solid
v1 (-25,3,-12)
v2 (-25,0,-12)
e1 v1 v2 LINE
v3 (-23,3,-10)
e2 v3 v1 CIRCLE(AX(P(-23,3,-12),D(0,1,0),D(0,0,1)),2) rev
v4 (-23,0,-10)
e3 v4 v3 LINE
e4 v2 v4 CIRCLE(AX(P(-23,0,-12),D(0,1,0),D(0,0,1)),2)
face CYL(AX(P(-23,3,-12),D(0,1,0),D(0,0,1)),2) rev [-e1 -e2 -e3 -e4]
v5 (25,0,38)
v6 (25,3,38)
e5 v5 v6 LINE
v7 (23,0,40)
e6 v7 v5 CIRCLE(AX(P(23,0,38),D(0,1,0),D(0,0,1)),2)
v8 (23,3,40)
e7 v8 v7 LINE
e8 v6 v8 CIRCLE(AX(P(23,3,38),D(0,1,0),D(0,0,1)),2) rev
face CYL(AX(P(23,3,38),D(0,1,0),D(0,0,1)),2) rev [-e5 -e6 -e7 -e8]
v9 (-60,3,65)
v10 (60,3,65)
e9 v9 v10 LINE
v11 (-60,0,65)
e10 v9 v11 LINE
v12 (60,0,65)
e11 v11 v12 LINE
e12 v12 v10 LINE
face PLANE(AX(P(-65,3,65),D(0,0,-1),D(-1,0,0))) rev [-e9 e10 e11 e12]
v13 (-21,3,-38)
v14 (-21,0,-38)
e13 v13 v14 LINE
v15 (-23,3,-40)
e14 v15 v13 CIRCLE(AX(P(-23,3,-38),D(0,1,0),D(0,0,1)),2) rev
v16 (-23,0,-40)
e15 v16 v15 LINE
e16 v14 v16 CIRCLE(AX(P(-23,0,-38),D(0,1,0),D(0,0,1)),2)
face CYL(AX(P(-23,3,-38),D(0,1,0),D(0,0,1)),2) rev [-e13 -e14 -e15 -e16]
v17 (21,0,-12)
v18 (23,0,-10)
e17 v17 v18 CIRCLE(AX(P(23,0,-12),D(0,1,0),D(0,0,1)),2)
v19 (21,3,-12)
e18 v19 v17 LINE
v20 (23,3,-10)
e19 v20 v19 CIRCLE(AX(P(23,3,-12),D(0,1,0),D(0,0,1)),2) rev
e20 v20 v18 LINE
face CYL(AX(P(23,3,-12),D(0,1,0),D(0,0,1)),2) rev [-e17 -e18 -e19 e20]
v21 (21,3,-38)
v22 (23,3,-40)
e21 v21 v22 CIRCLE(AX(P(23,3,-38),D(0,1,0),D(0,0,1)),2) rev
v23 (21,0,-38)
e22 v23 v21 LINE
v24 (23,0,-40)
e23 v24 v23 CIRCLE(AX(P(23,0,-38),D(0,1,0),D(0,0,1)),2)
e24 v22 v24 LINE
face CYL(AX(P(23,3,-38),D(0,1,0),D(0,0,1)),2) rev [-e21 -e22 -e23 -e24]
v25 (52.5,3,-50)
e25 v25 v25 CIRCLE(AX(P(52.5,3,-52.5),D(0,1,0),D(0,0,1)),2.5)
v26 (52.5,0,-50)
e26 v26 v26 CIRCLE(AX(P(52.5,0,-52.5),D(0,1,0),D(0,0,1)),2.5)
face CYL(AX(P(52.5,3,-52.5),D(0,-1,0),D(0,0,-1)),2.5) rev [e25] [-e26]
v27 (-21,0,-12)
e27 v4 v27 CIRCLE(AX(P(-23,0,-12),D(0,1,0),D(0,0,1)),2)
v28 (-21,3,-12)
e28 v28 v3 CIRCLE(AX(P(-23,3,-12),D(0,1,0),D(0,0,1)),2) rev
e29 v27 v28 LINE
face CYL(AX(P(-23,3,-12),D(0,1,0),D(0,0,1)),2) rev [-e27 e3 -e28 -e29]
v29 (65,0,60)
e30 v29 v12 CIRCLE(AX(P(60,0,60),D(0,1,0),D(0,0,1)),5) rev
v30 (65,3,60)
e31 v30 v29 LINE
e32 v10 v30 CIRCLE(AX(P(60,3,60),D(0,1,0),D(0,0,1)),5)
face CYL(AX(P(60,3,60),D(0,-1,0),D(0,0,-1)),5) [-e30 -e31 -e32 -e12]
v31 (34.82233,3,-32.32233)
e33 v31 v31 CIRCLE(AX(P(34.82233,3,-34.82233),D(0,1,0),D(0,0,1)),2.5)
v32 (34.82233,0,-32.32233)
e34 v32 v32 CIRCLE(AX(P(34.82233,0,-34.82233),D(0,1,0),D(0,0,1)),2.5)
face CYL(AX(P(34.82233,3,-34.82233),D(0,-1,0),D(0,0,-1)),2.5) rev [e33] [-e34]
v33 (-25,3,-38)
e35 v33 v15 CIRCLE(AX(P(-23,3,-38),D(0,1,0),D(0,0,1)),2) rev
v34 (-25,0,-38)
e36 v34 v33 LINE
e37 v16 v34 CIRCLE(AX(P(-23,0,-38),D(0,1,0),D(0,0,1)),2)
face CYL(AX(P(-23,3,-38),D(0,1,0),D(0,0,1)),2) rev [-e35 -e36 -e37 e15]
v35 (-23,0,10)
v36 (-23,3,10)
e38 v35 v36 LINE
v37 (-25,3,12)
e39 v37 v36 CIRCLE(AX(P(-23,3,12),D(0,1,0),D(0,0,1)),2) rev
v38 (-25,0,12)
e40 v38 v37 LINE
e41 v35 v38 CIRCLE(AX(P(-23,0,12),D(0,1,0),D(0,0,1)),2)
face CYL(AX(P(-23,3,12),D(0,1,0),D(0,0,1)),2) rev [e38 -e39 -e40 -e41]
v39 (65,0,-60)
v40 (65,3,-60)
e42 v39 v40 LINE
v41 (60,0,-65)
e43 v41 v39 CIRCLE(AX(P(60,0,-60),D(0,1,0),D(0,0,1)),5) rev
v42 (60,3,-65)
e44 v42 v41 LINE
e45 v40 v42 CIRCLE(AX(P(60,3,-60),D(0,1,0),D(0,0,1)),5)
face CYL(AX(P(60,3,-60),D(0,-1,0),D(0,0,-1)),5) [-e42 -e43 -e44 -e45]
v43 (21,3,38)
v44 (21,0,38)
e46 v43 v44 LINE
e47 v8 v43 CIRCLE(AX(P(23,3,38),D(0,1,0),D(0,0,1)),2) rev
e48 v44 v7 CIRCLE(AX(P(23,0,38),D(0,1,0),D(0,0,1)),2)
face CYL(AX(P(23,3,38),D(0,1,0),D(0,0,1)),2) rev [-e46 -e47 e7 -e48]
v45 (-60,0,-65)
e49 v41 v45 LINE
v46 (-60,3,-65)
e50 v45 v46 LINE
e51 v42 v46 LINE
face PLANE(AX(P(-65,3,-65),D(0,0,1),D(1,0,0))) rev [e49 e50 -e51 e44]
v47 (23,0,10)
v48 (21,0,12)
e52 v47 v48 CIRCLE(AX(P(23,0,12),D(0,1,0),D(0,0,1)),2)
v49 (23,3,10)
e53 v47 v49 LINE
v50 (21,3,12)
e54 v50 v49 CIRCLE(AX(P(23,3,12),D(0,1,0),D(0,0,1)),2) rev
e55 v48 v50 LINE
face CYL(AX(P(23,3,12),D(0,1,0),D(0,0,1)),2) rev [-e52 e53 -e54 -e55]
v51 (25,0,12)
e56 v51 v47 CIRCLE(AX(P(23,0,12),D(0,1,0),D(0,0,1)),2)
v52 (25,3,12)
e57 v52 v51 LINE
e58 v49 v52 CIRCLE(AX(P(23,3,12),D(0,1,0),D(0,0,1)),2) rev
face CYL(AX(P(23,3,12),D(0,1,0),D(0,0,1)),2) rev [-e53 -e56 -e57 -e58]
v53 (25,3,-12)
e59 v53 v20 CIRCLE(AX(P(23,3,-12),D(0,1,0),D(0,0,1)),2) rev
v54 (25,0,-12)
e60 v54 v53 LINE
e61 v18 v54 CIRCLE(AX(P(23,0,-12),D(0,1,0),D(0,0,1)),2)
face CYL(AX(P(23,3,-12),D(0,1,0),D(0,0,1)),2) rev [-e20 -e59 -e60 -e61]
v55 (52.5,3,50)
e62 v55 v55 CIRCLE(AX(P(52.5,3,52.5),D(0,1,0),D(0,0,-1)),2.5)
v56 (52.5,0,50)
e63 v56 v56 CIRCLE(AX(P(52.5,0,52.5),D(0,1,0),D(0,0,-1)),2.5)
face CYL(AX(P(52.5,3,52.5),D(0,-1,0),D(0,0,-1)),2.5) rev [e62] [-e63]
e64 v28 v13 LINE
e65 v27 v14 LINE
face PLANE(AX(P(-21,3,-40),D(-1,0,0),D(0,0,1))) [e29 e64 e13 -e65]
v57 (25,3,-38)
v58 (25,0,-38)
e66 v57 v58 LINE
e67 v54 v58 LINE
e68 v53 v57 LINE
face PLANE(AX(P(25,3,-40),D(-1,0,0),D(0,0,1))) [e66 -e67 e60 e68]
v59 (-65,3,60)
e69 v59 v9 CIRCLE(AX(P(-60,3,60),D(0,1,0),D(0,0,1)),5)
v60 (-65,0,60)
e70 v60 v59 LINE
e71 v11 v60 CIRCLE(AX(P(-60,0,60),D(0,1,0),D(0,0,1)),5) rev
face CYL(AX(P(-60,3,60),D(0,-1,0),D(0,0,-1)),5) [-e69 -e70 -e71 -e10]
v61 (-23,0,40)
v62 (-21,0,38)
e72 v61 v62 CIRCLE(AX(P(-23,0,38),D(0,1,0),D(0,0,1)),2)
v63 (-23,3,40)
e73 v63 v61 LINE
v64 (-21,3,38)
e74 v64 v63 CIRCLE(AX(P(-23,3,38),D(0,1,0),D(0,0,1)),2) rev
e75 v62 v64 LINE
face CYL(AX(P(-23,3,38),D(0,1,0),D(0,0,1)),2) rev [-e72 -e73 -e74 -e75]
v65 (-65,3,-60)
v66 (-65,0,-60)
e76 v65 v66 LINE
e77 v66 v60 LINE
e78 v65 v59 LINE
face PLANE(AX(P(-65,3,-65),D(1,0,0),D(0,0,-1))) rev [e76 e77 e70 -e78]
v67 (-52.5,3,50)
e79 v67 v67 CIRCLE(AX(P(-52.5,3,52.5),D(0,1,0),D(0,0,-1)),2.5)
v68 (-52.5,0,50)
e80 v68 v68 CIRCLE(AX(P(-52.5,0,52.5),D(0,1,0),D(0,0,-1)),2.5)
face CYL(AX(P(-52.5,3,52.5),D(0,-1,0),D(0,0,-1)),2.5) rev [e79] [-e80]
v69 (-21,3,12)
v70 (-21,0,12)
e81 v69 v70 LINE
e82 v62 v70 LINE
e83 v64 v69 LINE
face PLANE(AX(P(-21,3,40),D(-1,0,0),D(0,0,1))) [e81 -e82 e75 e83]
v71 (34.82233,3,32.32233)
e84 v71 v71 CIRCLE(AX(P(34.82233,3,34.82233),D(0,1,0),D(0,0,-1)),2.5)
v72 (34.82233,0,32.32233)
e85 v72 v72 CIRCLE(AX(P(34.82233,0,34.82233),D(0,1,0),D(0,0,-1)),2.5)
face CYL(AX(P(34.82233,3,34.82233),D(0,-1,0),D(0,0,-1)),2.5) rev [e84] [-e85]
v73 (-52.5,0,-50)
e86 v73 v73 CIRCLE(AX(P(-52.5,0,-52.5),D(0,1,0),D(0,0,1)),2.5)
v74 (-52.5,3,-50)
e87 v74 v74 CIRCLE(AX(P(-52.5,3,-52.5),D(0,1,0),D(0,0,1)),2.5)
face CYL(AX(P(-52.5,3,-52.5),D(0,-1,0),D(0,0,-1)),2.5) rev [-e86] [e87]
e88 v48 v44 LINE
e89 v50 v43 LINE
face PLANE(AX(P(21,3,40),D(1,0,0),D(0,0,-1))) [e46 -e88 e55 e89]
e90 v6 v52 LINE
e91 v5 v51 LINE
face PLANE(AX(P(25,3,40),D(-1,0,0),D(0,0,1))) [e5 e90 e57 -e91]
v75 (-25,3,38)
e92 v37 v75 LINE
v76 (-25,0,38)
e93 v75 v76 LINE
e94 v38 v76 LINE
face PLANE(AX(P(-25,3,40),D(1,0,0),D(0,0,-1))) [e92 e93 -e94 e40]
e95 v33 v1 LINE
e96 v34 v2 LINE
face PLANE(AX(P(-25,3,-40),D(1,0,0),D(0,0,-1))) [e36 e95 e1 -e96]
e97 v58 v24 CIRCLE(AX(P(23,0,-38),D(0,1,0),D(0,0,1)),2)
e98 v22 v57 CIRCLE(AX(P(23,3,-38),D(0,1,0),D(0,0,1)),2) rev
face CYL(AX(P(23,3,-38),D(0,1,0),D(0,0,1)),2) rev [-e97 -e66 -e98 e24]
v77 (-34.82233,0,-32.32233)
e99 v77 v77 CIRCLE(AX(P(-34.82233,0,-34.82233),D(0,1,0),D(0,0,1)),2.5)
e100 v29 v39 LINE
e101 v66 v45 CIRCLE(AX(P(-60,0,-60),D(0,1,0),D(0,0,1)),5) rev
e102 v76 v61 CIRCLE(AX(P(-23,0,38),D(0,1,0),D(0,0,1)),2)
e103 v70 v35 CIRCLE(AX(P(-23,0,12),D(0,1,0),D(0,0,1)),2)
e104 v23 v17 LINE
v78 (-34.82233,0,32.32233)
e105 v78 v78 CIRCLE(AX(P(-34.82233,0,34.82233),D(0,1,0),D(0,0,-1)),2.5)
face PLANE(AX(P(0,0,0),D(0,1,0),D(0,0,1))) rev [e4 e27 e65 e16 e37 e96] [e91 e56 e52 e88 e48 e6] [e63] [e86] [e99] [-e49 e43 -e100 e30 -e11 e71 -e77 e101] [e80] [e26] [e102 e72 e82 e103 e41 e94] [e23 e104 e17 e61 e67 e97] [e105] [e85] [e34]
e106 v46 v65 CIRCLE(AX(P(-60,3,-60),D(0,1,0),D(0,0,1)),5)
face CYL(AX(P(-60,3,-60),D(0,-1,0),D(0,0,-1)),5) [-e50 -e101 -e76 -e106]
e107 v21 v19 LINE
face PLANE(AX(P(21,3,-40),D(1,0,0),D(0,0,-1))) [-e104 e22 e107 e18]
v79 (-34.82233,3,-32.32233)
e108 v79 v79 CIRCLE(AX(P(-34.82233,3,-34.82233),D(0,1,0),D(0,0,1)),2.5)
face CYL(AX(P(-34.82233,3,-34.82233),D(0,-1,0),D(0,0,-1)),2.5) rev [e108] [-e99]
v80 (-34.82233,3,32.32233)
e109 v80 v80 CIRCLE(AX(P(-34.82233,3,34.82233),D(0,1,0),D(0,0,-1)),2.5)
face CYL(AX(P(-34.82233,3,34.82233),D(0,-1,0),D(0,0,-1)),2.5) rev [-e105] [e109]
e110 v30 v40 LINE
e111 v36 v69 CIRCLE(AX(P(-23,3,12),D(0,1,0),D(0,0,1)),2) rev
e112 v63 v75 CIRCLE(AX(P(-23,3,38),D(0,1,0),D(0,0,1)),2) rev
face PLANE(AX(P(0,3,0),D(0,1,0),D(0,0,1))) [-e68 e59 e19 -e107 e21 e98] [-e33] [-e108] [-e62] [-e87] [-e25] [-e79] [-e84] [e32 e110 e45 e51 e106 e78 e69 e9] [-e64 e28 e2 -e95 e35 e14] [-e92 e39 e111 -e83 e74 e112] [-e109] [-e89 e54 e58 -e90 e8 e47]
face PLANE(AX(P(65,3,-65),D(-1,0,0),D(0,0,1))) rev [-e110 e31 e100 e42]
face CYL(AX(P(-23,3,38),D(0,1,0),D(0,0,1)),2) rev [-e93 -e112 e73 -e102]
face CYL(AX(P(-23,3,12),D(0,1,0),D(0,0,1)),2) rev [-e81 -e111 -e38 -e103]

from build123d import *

# Parameters (mm, degrees)
SKETCH1_W           = 130
SKETCH1_H           = 130
SKETCH1_R           = 2.5
SKETCH1_W_2         = 4
SKETCH1_H_2         = 30
BOSS_EXTRUDE1_DEPTH = 3
FILLET1_R           = 5
FILLET2_R           = 2


with BuildPart() as part:
    # Sketch1 → Boss-Extrude1 (new body)
    with BuildSketch(Plane(origin=(0, 0, 0), x_dir=(1, 0, 0), z_dir=(0, 1, 0))):
        Rectangle(SKETCH1_W, SKETCH1_H)
        with Locations(Location((-52.5, 52.5, 0), (0, 0, 270))):
            Circle(SKETCH1_R, mode=Mode.SUBTRACT)
        with Locations(Location((-34.82233047, 34.82233047, 0), (0, 0, 270))):
            Circle(SKETCH1_R, mode=Mode.SUBTRACT)
        with Locations(Location((52.5, 52.5, 0), (0, 0, 270))):
            Circle(SKETCH1_R, mode=Mode.SUBTRACT)
        with Locations(Location((34.82233047, 34.82233047, 0), (0, 0, 270))):
            Circle(SKETCH1_R, mode=Mode.SUBTRACT)
        with Locations(Location((52.5, -52.5, 0), (0, 0, 90))):
            Circle(SKETCH1_R, mode=Mode.SUBTRACT)
        with Locations(Location((34.82233047, -34.82233047, 0), (0, 0, 90))):
            Circle(SKETCH1_R, mode=Mode.SUBTRACT)
        with Locations(Location((-34.82233047, -34.82233047, 0), (0, 0, 90))):
            Circle(SKETCH1_R, mode=Mode.SUBTRACT)
        with Locations(Location((-52.5, -52.5, 0), (0, 0, 90))):
            Circle(SKETCH1_R, mode=Mode.SUBTRACT)
        with Locations((-23, 25)):
            Rectangle(SKETCH1_W_2, SKETCH1_H_2, mode=Mode.SUBTRACT)
        with Locations((23, 25)):
            Rectangle(SKETCH1_W_2, SKETCH1_H_2, mode=Mode.SUBTRACT)
        with Locations((23, -25)):
            Rectangle(SKETCH1_W_2, SKETCH1_H_2, mode=Mode.SUBTRACT)
        with Locations((-23, -25)):
            Rectangle(SKETCH1_W_2, SKETCH1_H_2, mode=Mode.SUBTRACT)
    extrude(amount=BOSS_EXTRUDE1_DEPTH)

    # Fillet1
    fillet1_edges = [part.edges().sort_by_distance(p)[0] for p in [
        (65, 1.5, 65),
        (-65, 1.5, 65),
        (-65, 1.5, -65),
        (65, 1.5, -65),
    ]]
    fillet(fillet1_edges, radius=FILLET1_R)

    # Fillet2
    fillet2_edges = [part.edges().sort_by_distance(p)[0] for p in [
        (-25, 1.5, 40),
        (-21, 1.5, 40),
        (-25, 1.5, 10),
        (-21, 1.5, 10),
        (-21, 1.5, -10),
        (-25, 1.5, -10),
        (-25, 1.5, -40),
        (-21, 1.5, -40),
        (25, 1.5, -40),
        (21, 1.5, -40),
        (21, 1.5, -10),
        (25, 1.5, -10),
        (21, 1.5, 10),
        (25, 1.5, 10),
        (21, 1.5, 40),
        (25, 1.5, 40),
    ]]
    fillet(fillet2_edges, radius=FILLET2_R - 0.0001)  # a hair under: the kernel refuses the full size


solid = part.part
